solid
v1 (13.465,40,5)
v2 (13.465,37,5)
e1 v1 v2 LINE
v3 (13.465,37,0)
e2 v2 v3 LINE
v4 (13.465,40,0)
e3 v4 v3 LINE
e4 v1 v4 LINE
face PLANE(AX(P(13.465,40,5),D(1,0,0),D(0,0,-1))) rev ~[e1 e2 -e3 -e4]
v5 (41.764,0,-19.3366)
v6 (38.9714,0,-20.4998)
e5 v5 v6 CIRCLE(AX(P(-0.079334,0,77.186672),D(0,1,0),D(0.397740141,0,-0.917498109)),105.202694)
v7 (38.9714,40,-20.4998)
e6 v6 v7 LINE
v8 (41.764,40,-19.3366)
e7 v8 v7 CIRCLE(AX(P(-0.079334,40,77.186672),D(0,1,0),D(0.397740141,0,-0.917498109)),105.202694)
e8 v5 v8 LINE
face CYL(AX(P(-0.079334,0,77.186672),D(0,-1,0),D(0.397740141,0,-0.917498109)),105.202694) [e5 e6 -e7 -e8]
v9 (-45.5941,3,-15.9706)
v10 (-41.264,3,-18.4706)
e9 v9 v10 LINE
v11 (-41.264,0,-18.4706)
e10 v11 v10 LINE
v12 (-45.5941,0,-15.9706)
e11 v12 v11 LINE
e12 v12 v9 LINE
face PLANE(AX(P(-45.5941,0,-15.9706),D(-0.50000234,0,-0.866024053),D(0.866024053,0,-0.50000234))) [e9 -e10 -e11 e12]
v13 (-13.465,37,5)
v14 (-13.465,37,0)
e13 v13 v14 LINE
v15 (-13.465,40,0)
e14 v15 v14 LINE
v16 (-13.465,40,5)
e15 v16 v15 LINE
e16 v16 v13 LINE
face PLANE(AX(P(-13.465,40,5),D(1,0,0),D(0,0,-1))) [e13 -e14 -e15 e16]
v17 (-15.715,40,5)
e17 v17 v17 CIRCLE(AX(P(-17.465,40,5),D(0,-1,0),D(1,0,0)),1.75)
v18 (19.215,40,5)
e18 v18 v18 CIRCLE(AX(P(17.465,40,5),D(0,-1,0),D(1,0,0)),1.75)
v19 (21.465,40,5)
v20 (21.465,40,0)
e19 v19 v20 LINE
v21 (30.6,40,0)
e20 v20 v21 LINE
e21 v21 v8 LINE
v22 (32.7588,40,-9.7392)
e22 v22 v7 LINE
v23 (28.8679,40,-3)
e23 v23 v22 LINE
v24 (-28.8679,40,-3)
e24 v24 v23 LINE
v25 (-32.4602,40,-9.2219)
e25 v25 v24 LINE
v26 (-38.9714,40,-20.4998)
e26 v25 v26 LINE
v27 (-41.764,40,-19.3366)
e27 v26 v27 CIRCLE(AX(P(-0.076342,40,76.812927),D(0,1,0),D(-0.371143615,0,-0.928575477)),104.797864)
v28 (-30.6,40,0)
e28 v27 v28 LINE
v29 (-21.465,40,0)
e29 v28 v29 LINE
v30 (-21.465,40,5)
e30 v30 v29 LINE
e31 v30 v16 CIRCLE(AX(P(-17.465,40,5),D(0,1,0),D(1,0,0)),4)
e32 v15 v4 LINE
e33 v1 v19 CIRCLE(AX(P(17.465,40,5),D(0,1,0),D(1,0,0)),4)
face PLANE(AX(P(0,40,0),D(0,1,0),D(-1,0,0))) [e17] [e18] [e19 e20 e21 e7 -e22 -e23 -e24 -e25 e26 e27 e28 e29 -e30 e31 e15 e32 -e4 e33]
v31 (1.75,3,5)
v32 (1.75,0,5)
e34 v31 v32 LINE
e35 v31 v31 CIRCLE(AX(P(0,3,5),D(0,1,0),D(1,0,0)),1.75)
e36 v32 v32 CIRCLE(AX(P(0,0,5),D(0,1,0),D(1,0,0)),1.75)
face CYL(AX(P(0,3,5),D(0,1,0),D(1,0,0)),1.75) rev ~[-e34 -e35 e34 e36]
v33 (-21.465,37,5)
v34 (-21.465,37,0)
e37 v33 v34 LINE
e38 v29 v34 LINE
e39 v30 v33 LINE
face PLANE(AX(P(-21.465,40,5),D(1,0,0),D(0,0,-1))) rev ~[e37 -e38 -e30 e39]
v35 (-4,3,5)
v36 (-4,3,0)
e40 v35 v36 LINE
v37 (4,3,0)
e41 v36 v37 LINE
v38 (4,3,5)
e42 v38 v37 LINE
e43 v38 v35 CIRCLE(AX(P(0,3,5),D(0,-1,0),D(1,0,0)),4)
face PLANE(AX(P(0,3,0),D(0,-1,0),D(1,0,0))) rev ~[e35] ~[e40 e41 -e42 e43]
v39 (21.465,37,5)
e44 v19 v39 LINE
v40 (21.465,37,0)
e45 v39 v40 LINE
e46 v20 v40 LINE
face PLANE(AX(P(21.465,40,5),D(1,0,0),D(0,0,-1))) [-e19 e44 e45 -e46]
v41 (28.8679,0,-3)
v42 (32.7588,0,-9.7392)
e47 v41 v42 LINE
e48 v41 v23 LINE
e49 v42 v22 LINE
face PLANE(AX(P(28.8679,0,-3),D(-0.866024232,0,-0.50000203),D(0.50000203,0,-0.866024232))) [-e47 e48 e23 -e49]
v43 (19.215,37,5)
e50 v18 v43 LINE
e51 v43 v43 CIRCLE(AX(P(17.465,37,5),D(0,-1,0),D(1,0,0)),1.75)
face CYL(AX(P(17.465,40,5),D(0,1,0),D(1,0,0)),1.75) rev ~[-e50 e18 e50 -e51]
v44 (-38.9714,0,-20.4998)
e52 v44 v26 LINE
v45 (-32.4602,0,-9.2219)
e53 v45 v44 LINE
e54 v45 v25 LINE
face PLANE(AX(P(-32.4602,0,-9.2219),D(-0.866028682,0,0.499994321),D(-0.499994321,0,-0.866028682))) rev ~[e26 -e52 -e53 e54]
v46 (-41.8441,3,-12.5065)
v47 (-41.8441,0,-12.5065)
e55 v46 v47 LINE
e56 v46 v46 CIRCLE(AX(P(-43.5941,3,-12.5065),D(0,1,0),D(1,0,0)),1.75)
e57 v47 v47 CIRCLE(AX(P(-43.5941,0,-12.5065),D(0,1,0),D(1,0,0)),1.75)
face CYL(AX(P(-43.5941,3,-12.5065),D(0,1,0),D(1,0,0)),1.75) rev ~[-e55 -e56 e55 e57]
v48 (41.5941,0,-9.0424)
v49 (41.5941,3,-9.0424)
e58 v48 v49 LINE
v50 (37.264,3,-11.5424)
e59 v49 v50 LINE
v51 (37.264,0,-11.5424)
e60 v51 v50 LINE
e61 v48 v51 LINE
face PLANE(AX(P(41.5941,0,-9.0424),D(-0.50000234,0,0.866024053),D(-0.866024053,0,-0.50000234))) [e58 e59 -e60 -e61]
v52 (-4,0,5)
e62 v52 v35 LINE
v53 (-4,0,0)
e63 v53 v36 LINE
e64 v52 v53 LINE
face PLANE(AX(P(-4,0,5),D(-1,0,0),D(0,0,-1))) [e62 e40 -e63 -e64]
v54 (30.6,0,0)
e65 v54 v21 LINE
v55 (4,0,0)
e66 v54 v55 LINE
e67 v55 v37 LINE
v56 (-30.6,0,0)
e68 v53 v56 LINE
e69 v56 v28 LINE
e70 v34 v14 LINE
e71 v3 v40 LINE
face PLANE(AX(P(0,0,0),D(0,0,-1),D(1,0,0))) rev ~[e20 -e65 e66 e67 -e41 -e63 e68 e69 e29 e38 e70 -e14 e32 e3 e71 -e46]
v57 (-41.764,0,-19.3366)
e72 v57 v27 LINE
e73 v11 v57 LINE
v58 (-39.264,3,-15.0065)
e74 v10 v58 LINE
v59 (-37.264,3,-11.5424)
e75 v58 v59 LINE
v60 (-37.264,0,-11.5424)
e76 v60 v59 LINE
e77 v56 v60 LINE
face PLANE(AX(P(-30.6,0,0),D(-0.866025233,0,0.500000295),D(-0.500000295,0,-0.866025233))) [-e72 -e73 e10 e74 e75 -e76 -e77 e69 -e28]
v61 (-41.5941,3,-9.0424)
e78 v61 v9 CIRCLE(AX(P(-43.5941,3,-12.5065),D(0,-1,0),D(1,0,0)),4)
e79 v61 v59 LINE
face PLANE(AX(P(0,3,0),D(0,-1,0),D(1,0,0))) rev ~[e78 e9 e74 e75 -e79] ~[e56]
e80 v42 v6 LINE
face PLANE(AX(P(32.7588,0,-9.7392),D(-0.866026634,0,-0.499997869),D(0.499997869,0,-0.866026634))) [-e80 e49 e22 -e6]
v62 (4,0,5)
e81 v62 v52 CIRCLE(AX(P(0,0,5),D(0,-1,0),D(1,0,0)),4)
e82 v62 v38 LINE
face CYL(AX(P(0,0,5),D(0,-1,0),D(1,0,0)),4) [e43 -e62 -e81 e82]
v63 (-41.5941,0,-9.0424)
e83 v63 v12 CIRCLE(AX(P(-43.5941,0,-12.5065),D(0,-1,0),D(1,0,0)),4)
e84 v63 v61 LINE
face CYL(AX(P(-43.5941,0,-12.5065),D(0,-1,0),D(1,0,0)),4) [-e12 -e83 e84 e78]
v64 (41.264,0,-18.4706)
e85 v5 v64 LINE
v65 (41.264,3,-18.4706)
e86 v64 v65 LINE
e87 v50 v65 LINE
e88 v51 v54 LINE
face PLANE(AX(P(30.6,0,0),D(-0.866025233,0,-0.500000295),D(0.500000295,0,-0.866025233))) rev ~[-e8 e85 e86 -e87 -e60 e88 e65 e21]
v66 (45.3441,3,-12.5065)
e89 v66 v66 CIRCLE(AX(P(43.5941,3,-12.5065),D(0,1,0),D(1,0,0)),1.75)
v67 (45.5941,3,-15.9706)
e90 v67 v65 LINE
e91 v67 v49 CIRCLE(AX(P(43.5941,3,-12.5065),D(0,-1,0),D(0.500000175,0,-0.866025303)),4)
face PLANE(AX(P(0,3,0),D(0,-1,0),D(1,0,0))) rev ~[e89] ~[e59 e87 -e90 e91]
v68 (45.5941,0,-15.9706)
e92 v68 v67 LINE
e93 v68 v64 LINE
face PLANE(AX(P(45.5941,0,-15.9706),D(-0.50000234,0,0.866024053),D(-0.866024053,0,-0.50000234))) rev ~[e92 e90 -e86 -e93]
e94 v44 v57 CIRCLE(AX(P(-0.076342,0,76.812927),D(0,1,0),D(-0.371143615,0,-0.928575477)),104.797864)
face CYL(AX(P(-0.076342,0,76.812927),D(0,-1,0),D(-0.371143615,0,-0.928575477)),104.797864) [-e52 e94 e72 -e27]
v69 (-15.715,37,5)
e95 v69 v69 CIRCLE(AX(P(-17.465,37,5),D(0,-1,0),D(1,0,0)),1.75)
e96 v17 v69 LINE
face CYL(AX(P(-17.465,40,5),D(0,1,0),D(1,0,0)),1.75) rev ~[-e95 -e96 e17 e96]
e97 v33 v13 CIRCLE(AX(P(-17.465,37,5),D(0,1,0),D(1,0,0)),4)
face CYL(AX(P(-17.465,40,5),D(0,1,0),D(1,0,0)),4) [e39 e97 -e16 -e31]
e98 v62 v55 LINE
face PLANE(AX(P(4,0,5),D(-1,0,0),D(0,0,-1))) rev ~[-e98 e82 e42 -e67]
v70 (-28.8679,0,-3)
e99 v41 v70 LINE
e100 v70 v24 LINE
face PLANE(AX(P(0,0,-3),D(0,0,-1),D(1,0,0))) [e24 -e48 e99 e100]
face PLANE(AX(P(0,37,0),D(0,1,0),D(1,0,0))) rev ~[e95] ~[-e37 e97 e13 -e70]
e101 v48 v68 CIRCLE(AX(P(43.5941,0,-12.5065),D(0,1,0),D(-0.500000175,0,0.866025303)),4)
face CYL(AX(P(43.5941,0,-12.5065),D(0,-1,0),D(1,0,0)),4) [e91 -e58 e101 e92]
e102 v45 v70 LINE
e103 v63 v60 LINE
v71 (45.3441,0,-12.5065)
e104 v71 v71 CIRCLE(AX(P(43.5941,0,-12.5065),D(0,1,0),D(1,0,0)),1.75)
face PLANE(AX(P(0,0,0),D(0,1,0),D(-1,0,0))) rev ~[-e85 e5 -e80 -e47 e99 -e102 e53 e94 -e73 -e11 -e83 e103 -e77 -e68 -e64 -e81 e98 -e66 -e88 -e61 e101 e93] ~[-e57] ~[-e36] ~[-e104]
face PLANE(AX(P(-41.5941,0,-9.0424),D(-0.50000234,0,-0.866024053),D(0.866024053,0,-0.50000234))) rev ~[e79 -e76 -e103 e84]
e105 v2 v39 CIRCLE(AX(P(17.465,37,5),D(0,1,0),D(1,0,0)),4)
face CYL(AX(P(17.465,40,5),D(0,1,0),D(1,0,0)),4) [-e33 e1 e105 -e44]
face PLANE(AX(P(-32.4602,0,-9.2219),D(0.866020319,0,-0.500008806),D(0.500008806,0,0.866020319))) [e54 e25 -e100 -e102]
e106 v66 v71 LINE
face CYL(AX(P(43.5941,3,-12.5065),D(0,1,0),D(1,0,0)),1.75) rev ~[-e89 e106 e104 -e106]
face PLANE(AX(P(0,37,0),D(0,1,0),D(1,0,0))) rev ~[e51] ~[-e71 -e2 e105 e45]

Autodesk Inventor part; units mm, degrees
ref_plane "YZ Plane" through (0, 0, 0) normal (1, 0, 0) x (0, 1, 0)
ref_plane "XZ Plane" through (0, 0, 0) normal (0, 1, 0) x (-1, 0, 0)
ref_plane "XY Plane" through (0, 0, 0) normal (0, 0, 1) x (1, 0, 0)
sketch "Sketch1" plane through (0, 0, 0) normal (0, 1, 0) x (-1, 0, 0)
  line L0 (0, 0) -> (-30.6, 0)
  line L1 (0, 0) -> (30.6, 0)
  line L2 (30.6, 0) -> (41.764, -19.3366)
  line L3 (30.6, 0) -> (52.928, 0) construction
  line L4 (-30.6, 0) -> (-41.764, -19.3366)
  line L5 (-30.6, 0) -> (-8.272, 0) construction
  line L6 (0, 0) -> (0, 77)
  line L7 (0, 0) -> (0, -3)
  line L8 (-35.3569, -8.2392) -> (-32.7588, -9.7392)
  line L9 (35.0582, -7.7219) -> (32.4602, -9.2219)
  line L10 (32.4602, -9.2219) -> (28.8679, -3)
  line L11 (28.8679, -3) -> (0, -3)
  line L12 (0, -3) -> (-28.8679, -3)
  line L13 (-28.8679, -3) -> (-32.7588, -9.7392)
  line L14 (-32.7588, -9.7392) -> (-38.9714, -20.4998)
  line L15 (32.4602, -9.2219) -> (38.9714, -20.4998)
  arc A0 (38.9714, -20.4998) -> (41.764, -19.3366) centre (0, 77) ccw
  arc A1 (-41.764, -19.3366) -> (-38.9714, -20.4998) centre (0, 77) ccw
  dimension "d0" = 30.6
  dimension "d1" = 30.6
  dimension "d2" = 22.328
  dimension "d3" = 60
  dimension "d4" = 22.328
  dimension "d5" = 120
  dimension "d6" = 77
  dimension "d7" = 3
  dimension "d8" = 3
  dimension "d9" = 3
extrude "Extrusion1" add sketch "Sketch1" along normal blind 40
sketch "Sketch2" plane through (0, 0, 0) normal (0, -1, 0) x (1, 0, 0)
  line L0 (0, 0) -> (0, 5)
  circle A0 centre (0, 5) radius 1.5
  line L1 (-41.764, -19.3366) -> (-39.264, -15.0065)
  line L2 (-41.764, -19.3366) -> (-30.6, 0) projected
  line L3 (-39.264, -15.0065) -> (-43.5941, -12.5065)
  arc A1 (38.9714, -20.4998) -> (41.764, -19.3366) centre (0, 77) ccw projected
  line L4 (38.9714, -20.4998) -> (39.264, -15.0065)
  line L5 (30.6, 0) -> (41.764, -19.3366) projected
  line L6 (41.764, -19.3366) -> (39.264, -15.0065)
  line L7 (39.264, -15.0065) -> (43.5941, -12.5065)
  circle A2 centre (43.5941, -12.5065) radius 1.5
  circle A3 centre (-43.5941, -12.5065) radius 1.5
  circle A4 centre (-43.5941, -12.5065) radius 4
  circle A5 centre (0, 5) radius 4
  circle A6 centre (43.5941, -12.5065) radius 4
  line L8 (43.5941, -12.5065) -> (45.5941, -15.9706)
  line L9 (45.5941, -15.9706) -> (41.264, -18.4706)
  line L10 (43.5941, -12.5065) -> (41.5941, -9.0424)
  line L11 (41.5941, -9.0424) -> (37.264, -11.5424)
  line L12 (4, 5) -> (4, 0)
  line L13 (-30.6, 0) -> (30.6, 0) projected
  line L14 (-4, 5) -> (-4, 0)
  line L15 (-43.5941, -12.5065) -> (-45.5941, -15.9706)
  line L16 (-45.5941, -15.9706) -> (-41.264, -18.4706)
  line L17 (-41.764, -19.3366) -> (-30.6, 0) projected
  line L18 (-43.5941, -12.5065) -> (-41.5941, -9.0424)
  line L19 (-41.5941, -9.0424) -> (-37.264, -11.5424)
  dimension "d12" = 5
  dimension "d13" = 3
  dimension "d14" = 5
  dimension "d15" = 5
  dimension "d16" = 5.5011
  dimension "d17" = 5
  dimension "d18" = 3
  dimension "d19" = 8
  dimension "d20" = 8
  dimension "d21" = 8
extrude "Extrusion2" add sketch "Sketch2" against normal blind 3 contours L13 L14 A5 L0 | L0 A5 L12 L13 | A5 | L16 A4 L3 L1 | L3 A4 L19 L2 | L15 A3 L3 A4 | A4 L18 A3 L15 | L3 A3 L18 A4 | L15 L3 A3 | A3 L18 L15 | L3 L18 A3 | L7 A6 L9 L5 | L5 L11 A6 L7 | A6 L10 A2 L7 | L7 A2 L8 A6 | L8 A2 L10 A6 | A2 L10 L7 | L7 L8 A2 | L8 L10 A2
sketch "Sketch3" plane through (0, 3, 0) normal (0, 1, 0) x (1, 0, 0)
  arc A0 (41.5941, 9.0424) -> (45.5941, 15.9706) centre (43.5941, 12.5065) ccw projected
  circle A1 centre (43.5941, 12.5065) radius 1.5
  arc A2 (-45.5941, 15.9706) -> (-41.5941, 9.0424) centre (-43.5941, 12.5065) ccw projected
  circle A3 centre (-43.5941, 12.5065) radius 1.5
  point P0 (0, 0)
  dimension "d24" = 3
extrude "Extrusion3" cut sketch "Sketch3" against normal blind 3
sketch "Sketch4" plane through (-30.6, 40, 0) normal (0, 0, 1) x (1, 0, 0)
  point P0 (30.6, -40)
sketch "Sketch5" plane through (0, 40, 0) normal (0, 1, 0) x (1, 0, 0)
  circle A0 centre (0, -5) radius 1.5 projected
  line L0 (0, -5) -> (17.465, -5)
  line L1 (0, -5) -> (-17.465, -5)
  circle A1 centre (-17.465, -5) radius 1.75
  circle A2 centre (17.465, -5) radius 1.75
  line L2 (-17.465, -5) -> (-21.465, -5)
  line L3 (-21.465, -5) -> (-21.465, 0)
  line L4 (-17.465, -5) -> (-13.465, -5)
  line L5 (-13.465, -5) -> (-13.465, 0)
  circle A3 centre (-17.465, -5) radius 4
  line L6 (17.465, -5) -> (13.465, -5)
  line L7 (13.465, -5) -> (13.465, 0)
  line L8 (-30.6, 0) -> (30.6, 0) projected
  line L9 (17.465, -5) -> (21.465, -5)
  line L10 (21.465, -5) -> (21.465, 0)
  circle A4 centre (17.465, -5) radius 4
  point P0 (0, 0)
  dimension "d27" = 17.465
  dimension "d28" = 17.465
  dimension "d29" = 3.5
  dimension "d30" = 4
  dimension "d31" = 4
  dimension "d32" = 4
  dimension "d33" = 4
extrude "Extrusion4" add sketch "Sketch5" against normal blind 3 contours A4 L9 A2 L0 | L7 L8 L10 A4 | L0 A2 L9 A4 | A3 L2 A1 L1 | A3 L3 L8 L5 | L1 A1 L2 A3 | A2 L9 L0 | L1 L2 A1 picked at (18.233, -4.1331) picked at (-16.697, -4.1331)
sketch "Sketch6" plane through (0, 40, 0) normal (0, 1, 0) x (1, 0, 0)
  arc A0 (-19.215, -5) -> (-15.715, -5) centre (-17.465, -5) ccw projected
  line L0 (-19.215, -5) -> (-15.715, -5) projected
  circle A1 centre (-17.465, -5) radius 1.75
  arc A2 (15.715, -5) -> (19.215, -5) centre (17.465, -5) ccw projected
  line L1 (15.715, -5) -> (19.215, -5) projected
  circle A3 centre (17.465, -5) radius 1.75
  point P0 (0, 0)
extrude "Extrusion5" cut sketch "Sketch6" against normal blind 3 contours A1 L0 | A3 L1
sketch "Sketch7" plane through (0, 3, 0) normal (0, 1, 0) x (1, 0, 0)
  circle A0 centre (0, -5) radius 1.5 projected
  circle A1 centre (0, -5) radius 1.75
  circle A2 centre (43.5941, 12.5065) radius 1.5 projected
  circle A3 centre (43.5941, 12.5065) radius 1.75
  circle A4 centre (-43.5941, 12.5065) radius 1.5 projected
  circle A5 centre (-43.5941, 12.5065) radius 1.75
  point P0 (0, 0)
  dimension "d38" = 3.5
  dimension "d39" = 3.5
  dimension "d40" = 3.5
extrude "Extrusion6" cut sketch "Sketch7" against normal blind 3 contours A1 | A3 | A4 | A5
properties part number "Capcture Zone2"
